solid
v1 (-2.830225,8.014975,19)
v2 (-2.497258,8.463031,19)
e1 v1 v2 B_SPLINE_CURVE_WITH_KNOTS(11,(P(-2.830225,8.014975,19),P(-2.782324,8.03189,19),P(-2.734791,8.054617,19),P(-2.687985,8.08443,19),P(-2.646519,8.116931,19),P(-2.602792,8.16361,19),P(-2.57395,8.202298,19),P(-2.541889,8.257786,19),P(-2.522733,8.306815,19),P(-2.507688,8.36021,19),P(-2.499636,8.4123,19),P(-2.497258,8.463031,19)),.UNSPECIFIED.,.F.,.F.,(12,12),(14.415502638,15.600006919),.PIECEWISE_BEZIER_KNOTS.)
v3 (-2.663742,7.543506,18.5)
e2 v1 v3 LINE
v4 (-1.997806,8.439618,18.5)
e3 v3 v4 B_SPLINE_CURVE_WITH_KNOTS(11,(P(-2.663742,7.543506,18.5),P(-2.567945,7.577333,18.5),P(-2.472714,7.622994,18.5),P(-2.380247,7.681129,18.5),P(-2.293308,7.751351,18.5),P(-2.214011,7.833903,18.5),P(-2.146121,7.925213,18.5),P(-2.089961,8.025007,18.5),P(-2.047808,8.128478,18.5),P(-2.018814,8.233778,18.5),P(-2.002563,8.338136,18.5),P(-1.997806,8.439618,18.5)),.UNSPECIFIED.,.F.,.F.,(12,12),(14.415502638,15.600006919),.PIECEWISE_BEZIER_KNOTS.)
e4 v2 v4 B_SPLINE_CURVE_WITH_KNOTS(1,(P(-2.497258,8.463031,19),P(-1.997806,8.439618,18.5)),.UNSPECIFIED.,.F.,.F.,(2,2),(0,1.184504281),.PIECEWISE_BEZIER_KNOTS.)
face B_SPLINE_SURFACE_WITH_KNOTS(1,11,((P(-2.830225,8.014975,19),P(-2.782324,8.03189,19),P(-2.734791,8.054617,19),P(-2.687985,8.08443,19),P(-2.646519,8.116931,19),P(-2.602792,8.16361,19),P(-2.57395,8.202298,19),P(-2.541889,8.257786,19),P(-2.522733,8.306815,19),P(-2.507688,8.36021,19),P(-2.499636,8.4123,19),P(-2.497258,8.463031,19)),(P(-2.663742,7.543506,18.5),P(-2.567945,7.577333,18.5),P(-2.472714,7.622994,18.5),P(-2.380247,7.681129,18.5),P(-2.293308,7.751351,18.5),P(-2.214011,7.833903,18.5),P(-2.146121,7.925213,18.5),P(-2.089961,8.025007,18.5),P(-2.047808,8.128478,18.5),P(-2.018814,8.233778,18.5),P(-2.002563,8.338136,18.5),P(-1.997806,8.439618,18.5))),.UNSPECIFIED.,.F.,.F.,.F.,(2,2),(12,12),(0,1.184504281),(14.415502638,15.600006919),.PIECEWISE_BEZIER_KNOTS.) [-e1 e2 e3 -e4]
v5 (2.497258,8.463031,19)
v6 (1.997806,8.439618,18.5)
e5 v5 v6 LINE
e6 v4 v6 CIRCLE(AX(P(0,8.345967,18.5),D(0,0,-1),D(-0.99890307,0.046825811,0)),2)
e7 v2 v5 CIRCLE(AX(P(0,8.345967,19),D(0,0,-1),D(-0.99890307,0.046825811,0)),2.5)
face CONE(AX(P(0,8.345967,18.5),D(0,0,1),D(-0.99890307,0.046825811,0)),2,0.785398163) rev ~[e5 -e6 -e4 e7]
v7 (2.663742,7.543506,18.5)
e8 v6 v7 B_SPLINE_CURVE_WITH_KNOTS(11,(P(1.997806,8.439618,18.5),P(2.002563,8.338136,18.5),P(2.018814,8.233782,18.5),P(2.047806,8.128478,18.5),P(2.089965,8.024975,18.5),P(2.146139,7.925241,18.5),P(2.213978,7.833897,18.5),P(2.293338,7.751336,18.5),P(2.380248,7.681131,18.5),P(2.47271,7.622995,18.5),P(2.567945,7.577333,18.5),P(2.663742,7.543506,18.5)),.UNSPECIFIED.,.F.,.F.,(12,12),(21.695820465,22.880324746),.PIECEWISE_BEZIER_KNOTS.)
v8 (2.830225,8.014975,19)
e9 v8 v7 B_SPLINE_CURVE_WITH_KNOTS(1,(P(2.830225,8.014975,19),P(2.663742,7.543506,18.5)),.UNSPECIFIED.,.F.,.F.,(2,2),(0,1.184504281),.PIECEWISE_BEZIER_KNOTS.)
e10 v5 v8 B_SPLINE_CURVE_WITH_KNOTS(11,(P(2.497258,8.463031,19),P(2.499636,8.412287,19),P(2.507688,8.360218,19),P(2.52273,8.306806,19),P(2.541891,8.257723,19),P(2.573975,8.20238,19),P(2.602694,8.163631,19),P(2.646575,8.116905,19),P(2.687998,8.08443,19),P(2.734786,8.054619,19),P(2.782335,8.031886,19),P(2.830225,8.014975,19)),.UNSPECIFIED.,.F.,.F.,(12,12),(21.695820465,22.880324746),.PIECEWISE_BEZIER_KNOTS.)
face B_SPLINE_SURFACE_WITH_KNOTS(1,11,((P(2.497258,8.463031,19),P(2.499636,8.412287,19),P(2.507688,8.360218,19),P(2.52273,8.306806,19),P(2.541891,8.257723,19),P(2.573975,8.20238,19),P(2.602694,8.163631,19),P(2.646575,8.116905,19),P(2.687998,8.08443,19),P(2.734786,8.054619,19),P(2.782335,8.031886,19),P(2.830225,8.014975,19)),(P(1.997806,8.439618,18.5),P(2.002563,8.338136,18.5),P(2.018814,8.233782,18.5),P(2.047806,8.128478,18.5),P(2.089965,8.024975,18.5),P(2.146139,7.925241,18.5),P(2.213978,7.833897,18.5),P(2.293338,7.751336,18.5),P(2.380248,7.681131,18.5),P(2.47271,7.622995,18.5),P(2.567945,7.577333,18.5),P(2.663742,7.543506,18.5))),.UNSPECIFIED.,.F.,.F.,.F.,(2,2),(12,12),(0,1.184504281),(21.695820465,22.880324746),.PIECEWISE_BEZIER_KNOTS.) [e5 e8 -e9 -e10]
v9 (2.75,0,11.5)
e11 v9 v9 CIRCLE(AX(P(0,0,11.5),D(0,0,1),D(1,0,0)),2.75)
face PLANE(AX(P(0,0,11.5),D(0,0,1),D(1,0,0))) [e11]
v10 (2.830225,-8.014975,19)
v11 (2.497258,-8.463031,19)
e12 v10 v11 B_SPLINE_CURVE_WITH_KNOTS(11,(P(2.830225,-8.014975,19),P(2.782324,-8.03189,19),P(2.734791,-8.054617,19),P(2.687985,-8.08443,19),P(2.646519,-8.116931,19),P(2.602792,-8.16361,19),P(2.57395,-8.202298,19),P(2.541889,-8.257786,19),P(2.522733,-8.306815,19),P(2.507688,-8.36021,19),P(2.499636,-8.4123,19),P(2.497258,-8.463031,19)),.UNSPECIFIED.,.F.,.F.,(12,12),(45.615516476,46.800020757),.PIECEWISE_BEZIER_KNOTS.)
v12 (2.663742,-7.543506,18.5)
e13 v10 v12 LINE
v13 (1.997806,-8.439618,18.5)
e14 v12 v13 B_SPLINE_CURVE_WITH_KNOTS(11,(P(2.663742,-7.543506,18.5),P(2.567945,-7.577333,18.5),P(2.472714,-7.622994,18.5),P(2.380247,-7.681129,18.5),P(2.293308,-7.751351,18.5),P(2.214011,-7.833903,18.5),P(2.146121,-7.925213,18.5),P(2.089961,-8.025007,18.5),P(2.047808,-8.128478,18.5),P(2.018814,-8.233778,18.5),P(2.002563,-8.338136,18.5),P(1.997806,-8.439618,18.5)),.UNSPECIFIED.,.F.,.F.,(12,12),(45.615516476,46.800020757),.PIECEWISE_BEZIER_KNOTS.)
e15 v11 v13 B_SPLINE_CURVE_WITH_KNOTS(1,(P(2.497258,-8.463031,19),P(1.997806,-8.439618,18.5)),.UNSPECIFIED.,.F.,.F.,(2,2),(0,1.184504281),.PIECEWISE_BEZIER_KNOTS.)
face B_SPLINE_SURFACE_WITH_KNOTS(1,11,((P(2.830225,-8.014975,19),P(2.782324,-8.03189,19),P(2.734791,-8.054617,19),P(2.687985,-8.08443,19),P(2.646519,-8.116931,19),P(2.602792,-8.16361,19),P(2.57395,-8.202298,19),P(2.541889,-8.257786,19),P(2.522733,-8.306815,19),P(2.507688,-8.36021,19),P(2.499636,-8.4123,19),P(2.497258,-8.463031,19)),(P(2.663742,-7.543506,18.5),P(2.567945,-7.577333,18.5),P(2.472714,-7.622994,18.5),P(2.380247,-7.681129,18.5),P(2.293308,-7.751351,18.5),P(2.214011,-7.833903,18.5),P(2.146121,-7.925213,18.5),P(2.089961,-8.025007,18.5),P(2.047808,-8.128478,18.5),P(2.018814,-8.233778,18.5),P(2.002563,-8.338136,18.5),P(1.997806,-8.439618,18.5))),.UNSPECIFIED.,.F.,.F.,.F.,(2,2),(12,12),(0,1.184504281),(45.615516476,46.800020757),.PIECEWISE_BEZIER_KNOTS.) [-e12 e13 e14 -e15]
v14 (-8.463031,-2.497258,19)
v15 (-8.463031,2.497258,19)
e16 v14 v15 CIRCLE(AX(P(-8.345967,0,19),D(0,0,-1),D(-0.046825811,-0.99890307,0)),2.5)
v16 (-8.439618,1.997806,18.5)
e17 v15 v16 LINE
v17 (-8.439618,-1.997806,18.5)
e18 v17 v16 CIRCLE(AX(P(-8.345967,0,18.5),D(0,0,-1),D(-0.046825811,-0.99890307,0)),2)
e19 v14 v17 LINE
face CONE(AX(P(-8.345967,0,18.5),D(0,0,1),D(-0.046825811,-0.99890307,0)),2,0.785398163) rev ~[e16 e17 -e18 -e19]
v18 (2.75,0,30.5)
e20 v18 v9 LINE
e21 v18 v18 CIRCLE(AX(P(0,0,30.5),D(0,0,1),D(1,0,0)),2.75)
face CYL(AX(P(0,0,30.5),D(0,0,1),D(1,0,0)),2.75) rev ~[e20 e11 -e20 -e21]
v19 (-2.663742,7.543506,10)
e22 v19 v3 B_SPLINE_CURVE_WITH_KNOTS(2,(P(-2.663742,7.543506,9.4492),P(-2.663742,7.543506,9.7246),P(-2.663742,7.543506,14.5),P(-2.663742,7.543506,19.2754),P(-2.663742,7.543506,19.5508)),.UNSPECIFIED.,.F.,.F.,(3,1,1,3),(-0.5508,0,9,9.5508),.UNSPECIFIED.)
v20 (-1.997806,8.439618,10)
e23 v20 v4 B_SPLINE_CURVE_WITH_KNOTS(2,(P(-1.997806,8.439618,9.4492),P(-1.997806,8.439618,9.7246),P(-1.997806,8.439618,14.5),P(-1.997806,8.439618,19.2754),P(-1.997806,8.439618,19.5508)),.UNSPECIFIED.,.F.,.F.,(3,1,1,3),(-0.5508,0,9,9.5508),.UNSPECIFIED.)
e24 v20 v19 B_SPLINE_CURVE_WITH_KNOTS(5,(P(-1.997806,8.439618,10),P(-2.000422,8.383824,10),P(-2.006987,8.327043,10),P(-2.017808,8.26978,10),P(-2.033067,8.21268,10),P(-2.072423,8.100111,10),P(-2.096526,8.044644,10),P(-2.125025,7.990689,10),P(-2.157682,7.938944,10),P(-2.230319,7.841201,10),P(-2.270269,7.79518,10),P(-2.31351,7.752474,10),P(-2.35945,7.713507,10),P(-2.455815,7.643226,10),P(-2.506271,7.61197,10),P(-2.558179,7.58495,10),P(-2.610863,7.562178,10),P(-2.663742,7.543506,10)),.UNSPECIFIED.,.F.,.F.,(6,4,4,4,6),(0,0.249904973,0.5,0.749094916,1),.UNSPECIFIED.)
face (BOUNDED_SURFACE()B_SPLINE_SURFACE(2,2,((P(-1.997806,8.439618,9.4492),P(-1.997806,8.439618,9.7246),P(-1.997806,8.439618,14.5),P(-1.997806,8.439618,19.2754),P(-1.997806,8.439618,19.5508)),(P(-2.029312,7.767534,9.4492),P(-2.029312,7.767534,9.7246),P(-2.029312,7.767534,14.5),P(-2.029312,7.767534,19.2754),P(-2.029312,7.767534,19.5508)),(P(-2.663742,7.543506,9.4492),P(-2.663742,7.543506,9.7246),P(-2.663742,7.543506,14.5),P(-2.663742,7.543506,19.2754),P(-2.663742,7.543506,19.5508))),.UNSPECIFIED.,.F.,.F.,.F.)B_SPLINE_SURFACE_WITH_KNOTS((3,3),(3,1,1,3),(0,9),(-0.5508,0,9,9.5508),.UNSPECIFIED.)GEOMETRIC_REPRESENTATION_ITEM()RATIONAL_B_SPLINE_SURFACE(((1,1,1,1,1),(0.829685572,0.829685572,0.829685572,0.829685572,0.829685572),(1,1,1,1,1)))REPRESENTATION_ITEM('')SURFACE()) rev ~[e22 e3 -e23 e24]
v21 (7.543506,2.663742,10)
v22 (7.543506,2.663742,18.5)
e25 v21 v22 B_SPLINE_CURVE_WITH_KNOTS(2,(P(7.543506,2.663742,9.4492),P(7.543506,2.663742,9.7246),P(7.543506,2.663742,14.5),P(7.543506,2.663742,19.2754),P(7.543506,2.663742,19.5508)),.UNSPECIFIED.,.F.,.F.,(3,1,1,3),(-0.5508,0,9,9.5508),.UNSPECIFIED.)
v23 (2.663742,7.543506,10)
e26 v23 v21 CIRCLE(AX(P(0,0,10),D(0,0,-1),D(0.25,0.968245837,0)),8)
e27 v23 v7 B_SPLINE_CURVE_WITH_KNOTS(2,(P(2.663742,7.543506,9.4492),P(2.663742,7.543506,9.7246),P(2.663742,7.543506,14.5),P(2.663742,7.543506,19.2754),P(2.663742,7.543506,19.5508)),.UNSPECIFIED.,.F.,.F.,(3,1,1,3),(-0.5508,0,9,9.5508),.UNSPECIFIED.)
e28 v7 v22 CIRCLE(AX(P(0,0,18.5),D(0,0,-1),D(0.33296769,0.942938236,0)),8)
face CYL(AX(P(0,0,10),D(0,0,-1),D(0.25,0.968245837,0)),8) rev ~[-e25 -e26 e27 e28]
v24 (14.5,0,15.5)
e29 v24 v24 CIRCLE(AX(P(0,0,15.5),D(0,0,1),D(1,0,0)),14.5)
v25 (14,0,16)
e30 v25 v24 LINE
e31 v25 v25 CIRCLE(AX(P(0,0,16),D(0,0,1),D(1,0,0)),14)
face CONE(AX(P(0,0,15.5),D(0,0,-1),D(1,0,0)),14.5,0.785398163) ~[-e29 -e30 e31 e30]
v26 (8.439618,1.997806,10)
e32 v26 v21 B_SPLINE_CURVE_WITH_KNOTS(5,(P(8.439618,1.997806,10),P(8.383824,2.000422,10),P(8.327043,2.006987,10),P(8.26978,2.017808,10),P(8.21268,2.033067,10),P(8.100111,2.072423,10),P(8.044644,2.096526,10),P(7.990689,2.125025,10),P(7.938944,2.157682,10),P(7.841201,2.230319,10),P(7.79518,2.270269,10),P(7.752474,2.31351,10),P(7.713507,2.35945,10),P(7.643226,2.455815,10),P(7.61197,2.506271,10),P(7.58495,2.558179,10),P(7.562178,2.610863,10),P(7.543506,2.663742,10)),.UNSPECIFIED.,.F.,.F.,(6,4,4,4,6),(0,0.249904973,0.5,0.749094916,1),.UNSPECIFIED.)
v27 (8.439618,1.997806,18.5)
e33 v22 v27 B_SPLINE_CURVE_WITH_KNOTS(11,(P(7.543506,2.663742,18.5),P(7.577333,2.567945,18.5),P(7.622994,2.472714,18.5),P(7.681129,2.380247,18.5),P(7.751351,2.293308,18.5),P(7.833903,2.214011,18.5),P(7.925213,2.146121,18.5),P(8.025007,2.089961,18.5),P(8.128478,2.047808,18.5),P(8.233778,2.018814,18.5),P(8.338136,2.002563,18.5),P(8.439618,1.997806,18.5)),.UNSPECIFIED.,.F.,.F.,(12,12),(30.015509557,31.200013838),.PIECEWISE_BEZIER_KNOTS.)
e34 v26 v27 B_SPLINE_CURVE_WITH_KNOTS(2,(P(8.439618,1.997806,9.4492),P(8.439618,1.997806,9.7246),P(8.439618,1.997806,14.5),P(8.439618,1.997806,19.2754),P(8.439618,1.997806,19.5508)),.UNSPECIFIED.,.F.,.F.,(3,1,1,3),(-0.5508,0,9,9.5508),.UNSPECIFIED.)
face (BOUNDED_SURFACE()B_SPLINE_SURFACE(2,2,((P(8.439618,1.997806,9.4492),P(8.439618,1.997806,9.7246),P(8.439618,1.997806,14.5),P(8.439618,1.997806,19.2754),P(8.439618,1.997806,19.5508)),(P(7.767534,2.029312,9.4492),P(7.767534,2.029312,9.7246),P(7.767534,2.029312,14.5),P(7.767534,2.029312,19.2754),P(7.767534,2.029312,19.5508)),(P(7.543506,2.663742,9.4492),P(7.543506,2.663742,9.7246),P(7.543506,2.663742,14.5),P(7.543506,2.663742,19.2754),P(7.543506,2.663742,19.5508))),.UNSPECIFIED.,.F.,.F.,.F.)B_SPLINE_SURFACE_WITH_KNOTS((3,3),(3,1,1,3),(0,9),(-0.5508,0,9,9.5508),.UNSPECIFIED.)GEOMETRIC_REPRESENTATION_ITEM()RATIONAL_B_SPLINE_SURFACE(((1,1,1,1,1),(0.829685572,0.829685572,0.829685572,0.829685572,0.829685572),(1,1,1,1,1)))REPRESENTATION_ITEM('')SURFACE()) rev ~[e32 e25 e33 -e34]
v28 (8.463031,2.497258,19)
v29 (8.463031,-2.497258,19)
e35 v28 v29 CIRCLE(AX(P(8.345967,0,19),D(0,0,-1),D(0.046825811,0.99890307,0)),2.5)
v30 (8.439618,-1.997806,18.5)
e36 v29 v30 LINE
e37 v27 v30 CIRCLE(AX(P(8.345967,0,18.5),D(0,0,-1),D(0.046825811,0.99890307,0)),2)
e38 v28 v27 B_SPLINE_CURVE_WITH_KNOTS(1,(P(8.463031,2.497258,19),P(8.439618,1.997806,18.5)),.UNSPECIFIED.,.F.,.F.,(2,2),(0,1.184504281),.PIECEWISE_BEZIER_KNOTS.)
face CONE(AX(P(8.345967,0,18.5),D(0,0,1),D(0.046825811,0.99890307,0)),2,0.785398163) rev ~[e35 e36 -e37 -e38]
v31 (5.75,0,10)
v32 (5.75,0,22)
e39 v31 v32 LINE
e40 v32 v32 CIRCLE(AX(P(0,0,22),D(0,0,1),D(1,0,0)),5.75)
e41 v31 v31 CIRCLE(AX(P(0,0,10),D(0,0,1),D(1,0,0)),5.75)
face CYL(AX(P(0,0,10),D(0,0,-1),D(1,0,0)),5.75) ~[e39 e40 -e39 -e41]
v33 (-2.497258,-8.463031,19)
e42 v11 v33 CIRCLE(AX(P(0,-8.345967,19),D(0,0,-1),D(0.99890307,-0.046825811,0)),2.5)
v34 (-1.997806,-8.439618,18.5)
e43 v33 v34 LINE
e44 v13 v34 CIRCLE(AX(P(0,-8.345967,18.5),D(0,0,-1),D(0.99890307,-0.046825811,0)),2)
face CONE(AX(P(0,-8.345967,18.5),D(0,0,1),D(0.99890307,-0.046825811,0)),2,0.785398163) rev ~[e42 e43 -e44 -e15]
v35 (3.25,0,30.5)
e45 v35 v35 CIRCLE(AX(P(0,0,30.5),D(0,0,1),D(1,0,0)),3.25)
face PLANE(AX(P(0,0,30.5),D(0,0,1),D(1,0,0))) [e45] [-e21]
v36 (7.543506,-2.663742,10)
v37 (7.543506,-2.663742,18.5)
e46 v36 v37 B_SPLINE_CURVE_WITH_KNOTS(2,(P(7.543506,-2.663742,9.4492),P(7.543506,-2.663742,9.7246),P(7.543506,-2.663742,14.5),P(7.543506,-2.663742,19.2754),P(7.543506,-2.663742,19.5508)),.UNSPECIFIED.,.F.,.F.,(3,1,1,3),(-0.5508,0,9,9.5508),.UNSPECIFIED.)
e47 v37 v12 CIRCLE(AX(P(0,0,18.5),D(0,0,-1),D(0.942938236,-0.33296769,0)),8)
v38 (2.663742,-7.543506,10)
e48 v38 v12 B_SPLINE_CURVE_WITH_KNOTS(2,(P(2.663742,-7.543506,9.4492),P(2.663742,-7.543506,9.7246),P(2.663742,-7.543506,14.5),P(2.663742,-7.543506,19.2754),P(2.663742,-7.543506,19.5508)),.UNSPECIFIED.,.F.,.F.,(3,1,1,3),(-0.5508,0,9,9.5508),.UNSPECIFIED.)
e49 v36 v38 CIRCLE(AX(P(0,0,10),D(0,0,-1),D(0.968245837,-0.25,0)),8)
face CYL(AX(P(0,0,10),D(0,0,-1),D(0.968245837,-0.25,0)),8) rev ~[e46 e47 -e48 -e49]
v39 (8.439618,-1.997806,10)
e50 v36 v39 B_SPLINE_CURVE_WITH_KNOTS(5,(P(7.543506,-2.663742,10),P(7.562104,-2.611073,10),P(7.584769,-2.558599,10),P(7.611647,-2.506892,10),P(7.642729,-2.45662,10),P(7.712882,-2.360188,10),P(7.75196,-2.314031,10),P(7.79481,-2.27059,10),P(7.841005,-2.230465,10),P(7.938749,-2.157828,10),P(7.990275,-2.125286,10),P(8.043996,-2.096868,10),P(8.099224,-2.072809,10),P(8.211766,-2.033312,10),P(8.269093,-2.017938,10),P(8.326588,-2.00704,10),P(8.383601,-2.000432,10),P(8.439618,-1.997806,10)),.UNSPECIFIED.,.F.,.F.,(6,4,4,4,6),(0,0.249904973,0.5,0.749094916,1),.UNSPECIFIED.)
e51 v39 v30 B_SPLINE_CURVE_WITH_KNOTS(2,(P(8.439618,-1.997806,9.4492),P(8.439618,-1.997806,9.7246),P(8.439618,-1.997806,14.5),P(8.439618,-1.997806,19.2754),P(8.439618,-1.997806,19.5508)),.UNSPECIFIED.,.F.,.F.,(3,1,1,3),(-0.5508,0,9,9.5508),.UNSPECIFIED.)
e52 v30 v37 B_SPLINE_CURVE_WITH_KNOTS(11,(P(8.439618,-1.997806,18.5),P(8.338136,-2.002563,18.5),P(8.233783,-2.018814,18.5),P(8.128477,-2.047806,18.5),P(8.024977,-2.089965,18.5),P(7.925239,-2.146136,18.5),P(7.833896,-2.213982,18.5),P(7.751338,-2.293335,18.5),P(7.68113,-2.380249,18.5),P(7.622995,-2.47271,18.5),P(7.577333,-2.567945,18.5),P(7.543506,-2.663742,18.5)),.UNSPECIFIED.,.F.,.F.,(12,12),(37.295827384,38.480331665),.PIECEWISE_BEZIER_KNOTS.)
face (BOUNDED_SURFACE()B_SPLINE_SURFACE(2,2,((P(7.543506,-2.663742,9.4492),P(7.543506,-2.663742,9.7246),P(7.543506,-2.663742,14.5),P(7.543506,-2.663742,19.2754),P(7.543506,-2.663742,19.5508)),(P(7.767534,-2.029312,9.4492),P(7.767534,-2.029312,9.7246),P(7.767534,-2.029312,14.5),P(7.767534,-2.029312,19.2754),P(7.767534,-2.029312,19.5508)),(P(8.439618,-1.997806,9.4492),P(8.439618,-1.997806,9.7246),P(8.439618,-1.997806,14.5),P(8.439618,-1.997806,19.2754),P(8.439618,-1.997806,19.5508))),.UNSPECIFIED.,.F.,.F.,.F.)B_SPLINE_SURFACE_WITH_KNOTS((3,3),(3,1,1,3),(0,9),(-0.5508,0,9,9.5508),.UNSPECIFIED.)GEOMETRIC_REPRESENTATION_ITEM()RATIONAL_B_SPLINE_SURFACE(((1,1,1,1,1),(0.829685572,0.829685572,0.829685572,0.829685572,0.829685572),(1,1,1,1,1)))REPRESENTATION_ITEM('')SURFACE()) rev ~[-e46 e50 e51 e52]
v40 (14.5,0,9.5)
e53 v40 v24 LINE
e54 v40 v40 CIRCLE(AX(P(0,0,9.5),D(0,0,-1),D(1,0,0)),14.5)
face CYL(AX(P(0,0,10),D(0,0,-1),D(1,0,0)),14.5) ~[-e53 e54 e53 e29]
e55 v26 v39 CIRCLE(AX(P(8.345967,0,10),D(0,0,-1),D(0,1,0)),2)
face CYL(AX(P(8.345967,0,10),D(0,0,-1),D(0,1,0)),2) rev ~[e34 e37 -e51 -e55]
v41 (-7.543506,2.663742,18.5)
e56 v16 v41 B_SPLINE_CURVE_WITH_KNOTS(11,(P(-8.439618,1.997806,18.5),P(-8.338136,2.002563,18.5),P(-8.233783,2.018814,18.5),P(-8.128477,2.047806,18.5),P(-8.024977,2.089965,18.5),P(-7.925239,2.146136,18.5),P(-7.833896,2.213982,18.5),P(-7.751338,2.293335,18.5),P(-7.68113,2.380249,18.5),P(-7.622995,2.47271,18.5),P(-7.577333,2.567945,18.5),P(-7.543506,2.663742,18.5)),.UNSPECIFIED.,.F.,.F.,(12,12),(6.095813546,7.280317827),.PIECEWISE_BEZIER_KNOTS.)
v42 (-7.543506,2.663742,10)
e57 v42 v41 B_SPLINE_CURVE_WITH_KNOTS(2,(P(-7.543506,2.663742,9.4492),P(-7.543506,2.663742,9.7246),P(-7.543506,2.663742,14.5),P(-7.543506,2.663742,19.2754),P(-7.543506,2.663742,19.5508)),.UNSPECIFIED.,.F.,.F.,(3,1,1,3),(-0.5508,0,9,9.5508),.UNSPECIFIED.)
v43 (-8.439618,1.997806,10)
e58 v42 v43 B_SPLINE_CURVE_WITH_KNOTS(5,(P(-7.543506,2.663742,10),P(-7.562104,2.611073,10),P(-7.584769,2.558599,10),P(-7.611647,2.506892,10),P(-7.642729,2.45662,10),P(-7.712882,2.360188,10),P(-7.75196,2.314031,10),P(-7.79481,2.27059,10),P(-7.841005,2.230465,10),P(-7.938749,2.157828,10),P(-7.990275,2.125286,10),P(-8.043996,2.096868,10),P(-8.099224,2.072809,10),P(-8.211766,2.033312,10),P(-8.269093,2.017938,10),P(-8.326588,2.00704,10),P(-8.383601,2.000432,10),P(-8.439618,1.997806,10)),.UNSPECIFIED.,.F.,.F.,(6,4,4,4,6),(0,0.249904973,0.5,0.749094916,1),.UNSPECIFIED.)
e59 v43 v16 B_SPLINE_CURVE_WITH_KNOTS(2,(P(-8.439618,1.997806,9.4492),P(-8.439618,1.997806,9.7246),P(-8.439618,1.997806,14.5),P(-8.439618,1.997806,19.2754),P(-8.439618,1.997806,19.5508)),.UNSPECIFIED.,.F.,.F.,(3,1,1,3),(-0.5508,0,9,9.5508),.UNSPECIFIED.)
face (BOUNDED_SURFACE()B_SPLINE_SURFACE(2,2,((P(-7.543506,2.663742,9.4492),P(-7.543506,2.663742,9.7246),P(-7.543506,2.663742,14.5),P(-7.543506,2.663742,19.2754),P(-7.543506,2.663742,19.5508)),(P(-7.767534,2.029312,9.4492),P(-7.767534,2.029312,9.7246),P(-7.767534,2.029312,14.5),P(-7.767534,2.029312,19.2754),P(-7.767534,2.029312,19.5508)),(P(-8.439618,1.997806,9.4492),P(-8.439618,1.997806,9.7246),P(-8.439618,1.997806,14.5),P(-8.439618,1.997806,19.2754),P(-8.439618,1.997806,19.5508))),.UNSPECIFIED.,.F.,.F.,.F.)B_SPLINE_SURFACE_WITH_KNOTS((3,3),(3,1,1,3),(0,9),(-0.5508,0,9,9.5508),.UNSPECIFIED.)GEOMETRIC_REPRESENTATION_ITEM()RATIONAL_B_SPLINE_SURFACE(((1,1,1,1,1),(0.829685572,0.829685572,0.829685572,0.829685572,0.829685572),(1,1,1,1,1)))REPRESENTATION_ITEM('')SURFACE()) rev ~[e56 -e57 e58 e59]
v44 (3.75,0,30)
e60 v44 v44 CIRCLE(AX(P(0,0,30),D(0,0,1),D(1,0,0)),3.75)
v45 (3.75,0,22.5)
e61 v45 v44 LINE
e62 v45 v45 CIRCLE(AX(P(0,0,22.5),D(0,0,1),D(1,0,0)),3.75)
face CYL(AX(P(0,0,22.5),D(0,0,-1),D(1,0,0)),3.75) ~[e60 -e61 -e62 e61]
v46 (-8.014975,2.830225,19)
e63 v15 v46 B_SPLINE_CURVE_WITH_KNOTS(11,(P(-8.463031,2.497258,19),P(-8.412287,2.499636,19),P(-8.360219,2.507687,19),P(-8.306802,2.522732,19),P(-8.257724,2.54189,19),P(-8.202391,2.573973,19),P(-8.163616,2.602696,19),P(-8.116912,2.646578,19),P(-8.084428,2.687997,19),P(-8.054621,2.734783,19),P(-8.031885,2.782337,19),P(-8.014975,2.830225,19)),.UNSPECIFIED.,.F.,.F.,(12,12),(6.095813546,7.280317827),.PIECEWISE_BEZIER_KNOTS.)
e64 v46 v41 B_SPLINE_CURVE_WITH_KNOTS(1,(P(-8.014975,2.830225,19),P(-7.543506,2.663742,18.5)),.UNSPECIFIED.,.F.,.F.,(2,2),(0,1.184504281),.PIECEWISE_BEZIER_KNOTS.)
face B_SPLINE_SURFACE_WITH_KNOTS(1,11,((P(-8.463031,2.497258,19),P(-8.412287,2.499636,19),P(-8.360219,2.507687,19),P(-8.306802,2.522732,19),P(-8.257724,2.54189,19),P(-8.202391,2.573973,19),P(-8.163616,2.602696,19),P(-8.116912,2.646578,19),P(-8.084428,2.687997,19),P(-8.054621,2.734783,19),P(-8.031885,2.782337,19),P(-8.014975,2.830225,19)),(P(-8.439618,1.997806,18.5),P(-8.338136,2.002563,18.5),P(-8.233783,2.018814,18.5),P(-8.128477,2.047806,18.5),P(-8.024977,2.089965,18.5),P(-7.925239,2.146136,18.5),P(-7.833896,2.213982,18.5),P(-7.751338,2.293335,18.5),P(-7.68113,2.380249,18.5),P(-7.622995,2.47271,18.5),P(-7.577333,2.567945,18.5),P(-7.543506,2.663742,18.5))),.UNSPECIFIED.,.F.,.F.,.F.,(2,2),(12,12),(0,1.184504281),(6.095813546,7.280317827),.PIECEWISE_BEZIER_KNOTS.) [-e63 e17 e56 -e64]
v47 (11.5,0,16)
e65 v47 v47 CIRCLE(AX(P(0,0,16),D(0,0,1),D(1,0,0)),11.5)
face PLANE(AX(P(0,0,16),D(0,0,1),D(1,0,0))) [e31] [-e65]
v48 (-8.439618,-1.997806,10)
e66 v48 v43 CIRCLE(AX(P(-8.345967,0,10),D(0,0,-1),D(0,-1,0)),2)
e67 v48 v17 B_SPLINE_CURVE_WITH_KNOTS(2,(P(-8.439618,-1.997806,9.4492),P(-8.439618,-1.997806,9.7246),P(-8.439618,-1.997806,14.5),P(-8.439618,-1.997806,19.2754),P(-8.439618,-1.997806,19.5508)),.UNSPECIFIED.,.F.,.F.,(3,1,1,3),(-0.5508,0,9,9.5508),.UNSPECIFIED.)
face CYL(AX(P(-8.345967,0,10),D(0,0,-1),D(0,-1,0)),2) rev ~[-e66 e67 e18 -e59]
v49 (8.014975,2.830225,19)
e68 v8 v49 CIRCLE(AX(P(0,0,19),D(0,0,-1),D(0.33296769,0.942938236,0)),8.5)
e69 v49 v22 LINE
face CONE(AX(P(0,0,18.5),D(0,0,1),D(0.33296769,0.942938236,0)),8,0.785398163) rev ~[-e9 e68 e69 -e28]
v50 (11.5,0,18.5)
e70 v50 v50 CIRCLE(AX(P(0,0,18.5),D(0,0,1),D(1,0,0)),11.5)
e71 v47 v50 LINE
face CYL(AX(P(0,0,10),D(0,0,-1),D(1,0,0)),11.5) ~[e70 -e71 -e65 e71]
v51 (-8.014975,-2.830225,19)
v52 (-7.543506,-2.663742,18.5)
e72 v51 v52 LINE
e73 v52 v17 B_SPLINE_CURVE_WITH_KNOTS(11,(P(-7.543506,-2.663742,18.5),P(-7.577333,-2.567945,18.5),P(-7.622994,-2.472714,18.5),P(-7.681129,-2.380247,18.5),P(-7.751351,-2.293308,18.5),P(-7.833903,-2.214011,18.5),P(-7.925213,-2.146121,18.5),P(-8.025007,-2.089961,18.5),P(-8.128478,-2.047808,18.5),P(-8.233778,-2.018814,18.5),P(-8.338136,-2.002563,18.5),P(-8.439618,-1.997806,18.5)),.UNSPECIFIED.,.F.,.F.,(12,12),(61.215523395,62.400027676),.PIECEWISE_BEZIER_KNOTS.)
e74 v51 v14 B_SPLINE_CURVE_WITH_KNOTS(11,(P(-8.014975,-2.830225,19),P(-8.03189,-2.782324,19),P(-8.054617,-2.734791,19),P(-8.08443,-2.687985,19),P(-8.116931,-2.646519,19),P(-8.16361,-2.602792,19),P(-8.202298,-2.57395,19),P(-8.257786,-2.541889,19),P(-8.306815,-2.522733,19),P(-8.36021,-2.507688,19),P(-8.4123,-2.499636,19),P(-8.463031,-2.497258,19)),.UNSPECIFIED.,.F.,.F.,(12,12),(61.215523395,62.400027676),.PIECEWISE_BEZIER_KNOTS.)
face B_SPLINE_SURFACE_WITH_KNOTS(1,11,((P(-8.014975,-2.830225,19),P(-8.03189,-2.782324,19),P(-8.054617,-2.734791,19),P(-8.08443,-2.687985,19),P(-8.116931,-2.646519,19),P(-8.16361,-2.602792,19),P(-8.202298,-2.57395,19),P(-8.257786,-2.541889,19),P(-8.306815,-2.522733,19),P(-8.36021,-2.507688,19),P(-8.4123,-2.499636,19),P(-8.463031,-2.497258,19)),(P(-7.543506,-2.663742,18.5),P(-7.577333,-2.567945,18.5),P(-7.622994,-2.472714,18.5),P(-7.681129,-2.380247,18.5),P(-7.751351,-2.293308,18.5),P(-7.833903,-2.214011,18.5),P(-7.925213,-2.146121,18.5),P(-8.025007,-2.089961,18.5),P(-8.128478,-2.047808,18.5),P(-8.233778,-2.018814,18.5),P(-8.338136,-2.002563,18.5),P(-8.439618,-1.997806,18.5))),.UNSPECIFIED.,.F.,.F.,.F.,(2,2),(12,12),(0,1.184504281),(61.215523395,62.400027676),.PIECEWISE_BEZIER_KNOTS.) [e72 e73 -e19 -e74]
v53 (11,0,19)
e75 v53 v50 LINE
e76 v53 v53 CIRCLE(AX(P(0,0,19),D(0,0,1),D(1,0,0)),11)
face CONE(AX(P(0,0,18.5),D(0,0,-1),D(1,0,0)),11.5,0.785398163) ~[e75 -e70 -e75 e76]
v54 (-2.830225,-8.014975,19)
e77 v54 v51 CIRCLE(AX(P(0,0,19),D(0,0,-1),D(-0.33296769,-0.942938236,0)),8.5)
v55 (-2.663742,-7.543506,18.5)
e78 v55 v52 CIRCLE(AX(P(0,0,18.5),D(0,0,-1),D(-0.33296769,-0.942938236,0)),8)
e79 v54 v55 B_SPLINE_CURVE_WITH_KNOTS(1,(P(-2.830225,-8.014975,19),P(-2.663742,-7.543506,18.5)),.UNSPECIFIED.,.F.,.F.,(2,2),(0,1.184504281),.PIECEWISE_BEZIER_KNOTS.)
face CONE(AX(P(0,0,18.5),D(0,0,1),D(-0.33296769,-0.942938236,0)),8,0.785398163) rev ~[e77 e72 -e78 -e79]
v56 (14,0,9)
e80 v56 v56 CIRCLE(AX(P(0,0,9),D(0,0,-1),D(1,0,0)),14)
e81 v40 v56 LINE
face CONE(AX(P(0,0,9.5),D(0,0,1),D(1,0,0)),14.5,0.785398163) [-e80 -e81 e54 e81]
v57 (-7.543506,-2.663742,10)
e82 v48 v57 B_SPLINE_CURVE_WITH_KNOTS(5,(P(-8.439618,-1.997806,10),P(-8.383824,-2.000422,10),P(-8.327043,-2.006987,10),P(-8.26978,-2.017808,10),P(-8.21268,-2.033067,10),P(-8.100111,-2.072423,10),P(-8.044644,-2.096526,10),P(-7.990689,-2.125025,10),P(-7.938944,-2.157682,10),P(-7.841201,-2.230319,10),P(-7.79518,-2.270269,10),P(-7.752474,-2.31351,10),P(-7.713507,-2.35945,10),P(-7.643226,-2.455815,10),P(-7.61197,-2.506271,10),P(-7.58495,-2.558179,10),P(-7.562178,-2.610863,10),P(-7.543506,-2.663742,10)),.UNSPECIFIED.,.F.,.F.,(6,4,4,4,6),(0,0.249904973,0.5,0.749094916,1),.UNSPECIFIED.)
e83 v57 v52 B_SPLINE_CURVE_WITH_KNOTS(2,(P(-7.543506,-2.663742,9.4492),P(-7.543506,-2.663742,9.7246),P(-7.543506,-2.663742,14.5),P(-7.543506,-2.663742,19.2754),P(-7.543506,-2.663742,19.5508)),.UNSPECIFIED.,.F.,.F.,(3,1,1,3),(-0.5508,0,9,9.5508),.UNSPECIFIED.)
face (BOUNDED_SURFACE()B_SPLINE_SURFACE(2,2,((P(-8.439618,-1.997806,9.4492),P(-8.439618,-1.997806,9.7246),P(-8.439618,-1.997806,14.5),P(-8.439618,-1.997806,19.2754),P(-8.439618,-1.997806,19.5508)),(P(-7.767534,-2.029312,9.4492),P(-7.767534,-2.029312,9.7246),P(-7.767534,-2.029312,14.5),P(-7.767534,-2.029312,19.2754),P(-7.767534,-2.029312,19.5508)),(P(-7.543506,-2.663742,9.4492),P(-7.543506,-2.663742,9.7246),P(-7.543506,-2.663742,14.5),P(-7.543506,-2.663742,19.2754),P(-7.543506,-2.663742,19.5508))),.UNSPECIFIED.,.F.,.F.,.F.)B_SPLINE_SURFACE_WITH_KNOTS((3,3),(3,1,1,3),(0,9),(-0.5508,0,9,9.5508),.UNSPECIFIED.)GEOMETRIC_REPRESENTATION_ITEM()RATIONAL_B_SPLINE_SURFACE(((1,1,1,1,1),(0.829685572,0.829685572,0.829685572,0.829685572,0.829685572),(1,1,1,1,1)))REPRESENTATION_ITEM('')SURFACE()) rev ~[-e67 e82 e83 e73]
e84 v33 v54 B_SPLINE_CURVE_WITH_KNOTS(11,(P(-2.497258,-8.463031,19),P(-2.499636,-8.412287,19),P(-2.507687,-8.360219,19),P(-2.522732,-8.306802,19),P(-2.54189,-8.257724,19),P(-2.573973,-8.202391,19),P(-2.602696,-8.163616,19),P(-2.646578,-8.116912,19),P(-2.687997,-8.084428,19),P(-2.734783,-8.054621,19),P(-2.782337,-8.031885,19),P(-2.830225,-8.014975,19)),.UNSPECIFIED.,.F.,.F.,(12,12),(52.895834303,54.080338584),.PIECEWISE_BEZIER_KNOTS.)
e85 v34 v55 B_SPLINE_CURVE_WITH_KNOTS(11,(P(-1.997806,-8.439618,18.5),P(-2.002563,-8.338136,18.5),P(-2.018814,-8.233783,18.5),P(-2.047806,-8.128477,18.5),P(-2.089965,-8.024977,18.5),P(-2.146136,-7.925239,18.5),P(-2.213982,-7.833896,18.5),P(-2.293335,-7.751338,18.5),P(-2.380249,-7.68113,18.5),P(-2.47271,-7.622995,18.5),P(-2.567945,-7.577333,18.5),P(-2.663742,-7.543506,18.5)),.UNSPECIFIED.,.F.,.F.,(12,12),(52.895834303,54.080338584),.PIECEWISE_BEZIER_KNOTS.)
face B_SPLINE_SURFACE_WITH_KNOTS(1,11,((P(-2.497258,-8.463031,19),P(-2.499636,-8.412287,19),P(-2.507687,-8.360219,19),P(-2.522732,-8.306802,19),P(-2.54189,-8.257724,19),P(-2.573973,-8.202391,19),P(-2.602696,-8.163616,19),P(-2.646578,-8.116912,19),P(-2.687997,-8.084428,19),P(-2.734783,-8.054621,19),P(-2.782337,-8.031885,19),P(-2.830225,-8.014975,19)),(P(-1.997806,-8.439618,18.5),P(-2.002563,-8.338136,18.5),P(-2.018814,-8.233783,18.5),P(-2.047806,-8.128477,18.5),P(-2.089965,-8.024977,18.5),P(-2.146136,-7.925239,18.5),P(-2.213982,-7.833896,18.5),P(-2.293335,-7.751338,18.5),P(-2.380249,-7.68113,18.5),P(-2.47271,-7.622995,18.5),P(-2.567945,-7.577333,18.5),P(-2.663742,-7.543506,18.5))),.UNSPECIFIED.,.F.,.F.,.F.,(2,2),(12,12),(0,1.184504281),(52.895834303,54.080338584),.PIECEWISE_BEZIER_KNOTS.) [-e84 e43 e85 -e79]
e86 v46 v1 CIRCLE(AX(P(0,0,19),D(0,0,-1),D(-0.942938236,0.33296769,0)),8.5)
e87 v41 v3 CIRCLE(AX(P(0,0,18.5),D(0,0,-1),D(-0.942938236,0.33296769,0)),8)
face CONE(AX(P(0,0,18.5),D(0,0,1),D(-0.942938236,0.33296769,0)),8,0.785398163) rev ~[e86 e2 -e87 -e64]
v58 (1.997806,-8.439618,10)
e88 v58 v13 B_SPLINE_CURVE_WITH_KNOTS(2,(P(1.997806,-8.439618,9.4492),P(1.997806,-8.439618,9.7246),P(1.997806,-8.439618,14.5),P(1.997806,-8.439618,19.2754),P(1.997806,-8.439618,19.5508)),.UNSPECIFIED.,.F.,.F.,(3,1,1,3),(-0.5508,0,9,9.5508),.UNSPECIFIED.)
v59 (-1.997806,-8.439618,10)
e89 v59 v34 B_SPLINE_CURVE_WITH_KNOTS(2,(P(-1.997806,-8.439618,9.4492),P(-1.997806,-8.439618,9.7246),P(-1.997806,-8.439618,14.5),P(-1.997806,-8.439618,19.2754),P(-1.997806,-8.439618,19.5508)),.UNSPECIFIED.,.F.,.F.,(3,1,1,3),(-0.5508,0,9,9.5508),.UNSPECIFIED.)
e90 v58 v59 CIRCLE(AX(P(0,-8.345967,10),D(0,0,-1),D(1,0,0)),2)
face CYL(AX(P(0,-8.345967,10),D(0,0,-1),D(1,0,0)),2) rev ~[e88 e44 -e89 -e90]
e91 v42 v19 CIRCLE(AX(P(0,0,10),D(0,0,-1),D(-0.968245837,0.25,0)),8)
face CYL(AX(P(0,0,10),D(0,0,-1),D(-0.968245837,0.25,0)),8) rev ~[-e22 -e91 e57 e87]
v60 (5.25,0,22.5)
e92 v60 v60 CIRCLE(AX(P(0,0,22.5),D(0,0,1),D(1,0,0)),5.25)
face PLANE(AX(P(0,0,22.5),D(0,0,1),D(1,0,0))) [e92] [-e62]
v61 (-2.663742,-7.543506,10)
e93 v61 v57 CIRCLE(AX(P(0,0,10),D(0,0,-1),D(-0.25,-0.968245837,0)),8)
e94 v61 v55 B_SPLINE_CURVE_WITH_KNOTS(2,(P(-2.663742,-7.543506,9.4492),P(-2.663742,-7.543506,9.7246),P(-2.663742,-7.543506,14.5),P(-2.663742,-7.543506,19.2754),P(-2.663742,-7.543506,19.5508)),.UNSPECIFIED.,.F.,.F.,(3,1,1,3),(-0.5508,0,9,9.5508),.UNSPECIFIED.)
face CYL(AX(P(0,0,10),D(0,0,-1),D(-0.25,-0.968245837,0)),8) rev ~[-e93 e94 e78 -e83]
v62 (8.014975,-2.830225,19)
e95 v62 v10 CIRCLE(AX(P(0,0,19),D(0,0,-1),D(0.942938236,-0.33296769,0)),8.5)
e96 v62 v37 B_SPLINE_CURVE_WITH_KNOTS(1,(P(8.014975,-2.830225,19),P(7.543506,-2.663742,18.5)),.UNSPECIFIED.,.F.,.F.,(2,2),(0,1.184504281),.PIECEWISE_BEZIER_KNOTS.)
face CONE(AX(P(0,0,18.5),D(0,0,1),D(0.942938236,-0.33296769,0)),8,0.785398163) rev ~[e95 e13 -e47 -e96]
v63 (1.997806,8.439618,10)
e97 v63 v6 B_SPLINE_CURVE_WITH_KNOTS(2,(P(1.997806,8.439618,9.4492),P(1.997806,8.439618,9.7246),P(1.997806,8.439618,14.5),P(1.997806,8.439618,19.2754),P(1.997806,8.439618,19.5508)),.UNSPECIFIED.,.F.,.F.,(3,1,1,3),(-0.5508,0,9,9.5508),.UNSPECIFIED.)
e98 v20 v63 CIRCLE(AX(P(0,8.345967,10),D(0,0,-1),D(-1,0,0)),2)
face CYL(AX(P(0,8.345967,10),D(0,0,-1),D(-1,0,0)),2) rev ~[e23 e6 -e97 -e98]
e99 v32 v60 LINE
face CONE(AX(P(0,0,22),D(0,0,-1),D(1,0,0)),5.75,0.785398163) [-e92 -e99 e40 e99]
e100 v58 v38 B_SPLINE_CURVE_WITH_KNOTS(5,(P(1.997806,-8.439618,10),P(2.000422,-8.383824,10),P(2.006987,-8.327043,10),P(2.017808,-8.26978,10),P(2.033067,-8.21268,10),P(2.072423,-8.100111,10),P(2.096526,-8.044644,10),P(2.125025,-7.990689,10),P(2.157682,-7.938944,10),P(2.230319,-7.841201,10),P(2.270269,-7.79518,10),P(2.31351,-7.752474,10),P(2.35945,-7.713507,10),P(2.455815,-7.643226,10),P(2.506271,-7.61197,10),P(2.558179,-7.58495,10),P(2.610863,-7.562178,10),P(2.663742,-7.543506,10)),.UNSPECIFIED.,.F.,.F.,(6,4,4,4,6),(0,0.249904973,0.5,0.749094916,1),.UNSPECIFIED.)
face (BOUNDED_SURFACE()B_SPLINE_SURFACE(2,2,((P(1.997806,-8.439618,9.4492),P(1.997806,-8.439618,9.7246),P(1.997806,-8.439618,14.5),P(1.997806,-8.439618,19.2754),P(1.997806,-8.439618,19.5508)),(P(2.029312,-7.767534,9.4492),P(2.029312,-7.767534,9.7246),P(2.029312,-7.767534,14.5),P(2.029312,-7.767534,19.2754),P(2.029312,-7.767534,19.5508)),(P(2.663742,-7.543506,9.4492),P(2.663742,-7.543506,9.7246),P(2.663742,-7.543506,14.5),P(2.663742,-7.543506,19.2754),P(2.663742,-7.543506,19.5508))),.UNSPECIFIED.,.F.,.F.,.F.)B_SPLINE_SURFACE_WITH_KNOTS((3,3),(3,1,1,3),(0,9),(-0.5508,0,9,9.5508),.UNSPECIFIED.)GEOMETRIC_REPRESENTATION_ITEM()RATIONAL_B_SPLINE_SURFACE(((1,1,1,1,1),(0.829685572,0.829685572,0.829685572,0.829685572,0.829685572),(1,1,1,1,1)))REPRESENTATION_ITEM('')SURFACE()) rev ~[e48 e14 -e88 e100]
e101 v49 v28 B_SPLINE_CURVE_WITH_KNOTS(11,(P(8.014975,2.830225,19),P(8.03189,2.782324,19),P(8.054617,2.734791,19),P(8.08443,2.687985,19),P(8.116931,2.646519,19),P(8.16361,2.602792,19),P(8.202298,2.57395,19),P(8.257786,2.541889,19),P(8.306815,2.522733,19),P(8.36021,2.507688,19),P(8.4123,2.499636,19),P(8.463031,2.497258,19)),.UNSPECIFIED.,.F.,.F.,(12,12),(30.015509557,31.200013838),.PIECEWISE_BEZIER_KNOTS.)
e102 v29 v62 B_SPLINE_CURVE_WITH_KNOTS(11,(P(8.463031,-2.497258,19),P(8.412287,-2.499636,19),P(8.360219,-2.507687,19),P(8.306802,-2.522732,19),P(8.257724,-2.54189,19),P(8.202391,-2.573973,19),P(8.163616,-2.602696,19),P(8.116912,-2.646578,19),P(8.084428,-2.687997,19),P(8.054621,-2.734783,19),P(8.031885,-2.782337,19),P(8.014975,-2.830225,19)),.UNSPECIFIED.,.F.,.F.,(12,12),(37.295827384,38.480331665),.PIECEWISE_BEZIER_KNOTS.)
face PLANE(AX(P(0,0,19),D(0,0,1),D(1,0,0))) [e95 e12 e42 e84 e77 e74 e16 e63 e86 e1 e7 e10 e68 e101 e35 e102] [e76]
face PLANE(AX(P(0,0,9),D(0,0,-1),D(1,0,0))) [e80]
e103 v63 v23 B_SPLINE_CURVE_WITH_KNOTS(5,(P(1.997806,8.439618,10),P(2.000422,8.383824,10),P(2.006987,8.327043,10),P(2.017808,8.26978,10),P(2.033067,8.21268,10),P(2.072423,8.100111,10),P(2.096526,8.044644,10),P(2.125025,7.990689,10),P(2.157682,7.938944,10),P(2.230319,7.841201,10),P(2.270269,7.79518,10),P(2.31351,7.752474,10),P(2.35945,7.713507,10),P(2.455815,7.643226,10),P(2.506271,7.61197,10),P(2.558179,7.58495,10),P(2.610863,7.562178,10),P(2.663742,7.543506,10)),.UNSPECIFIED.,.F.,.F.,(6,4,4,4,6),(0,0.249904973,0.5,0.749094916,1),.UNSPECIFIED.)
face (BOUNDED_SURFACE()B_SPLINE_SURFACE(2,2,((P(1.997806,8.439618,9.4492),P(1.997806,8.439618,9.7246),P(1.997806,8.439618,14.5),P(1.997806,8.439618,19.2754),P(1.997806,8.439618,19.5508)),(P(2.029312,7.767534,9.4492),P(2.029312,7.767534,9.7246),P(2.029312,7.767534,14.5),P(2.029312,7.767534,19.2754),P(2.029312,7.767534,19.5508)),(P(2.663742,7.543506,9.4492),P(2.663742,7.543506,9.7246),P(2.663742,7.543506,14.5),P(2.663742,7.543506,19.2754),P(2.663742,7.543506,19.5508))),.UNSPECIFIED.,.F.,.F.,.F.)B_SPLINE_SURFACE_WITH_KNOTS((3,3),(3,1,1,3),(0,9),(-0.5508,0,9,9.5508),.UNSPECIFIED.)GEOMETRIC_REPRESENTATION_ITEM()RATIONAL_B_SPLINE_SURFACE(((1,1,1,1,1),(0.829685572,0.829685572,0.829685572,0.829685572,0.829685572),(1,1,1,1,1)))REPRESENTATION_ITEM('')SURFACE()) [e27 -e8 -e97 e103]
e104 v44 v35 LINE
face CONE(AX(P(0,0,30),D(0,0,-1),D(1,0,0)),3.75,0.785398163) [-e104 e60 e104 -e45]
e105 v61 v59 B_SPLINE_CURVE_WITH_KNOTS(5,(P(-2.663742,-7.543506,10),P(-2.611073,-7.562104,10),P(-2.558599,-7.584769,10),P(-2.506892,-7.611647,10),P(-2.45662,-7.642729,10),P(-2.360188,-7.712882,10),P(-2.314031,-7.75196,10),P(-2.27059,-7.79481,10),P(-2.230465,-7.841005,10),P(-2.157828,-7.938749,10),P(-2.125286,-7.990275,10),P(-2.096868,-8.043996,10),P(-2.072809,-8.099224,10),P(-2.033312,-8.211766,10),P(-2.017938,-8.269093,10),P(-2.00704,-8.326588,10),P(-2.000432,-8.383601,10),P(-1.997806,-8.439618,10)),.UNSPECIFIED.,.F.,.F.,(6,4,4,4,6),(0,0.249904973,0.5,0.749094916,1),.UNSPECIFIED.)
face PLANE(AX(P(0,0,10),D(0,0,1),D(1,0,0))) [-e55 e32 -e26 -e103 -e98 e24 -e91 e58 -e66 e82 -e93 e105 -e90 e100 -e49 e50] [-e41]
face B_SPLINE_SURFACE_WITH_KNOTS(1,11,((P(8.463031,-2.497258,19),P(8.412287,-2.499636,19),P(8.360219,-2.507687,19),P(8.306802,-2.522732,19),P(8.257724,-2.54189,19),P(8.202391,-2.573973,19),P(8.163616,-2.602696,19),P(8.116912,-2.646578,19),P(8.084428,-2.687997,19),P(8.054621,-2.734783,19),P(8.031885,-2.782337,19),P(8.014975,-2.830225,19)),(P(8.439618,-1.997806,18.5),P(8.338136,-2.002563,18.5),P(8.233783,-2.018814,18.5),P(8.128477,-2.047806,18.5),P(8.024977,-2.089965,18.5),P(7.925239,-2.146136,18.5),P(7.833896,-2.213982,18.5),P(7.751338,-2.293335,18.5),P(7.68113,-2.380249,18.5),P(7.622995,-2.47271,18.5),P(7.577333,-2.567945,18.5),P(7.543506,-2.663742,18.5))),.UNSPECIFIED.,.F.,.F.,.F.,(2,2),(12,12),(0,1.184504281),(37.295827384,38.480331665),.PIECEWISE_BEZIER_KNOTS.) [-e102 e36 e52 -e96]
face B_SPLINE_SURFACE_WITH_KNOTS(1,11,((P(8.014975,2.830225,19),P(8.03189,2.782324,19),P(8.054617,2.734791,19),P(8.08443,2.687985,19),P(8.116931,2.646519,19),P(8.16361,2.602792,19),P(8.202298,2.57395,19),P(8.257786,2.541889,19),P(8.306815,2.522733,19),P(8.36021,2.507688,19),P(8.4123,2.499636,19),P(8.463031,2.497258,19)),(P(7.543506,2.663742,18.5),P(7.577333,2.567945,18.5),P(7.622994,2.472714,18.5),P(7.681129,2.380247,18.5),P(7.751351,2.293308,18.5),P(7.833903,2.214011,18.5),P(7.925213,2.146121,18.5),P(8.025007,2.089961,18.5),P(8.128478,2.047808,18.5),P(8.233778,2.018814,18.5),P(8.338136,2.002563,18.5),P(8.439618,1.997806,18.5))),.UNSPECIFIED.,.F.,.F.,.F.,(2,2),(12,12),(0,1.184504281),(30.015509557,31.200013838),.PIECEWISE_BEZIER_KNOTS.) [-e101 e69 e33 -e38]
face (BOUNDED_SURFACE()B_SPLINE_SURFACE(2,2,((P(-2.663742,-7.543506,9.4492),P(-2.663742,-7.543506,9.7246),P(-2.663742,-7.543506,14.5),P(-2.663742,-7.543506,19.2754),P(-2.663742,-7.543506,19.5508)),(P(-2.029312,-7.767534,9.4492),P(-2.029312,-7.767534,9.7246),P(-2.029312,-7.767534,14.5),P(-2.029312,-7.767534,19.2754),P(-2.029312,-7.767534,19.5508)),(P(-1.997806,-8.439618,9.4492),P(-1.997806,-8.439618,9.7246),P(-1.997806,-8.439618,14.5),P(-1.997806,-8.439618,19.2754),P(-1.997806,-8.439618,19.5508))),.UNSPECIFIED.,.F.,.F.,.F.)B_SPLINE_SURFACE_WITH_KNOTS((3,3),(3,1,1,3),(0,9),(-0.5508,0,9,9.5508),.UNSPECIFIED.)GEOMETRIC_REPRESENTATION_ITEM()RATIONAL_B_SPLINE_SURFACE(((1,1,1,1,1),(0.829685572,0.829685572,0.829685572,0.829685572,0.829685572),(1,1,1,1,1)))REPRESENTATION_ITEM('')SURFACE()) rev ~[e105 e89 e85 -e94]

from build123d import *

# Parameters (mm, degrees)
F0_R      = 14.5
F1_DEPTH  = 10
F2_R      = 11.5
F3_DEPTH  = 9
F4_R      = 14.5
F4_R_2    = 11.5
F5_DEPTH  = 6
F6_R      = 25
F7_DEPTH  = 9
F8_R      = 1
F9_R      = 5.75
F10_DEPTH = 12.5
F11_R     = 3.75
F12_DEPTH = 8
F13_SIZE  = 0.5
F14_R     = 2.75
F15_DEPTH = 19


with BuildPart() as f1:
    # F0 (on Top) → F1 (new body)
    with BuildSketch(Plane.XY):
        Circle(F0_R)
    extrude(amount=F1_DEPTH)

    # F2 (on face) → F3 (join)
    with BuildSketch(Plane.XY.offset(10)):
        Circle(F2_R)
        with BuildLine():
            ThreePointArc((2, 7.7459666924), (5.6568542495, 5.6568542495), (7.7459666924, 2))
            Line((7.7459666924, 2), (8.3459666924, 2))
            ThreePointArc((8.3459666924, 2), (10.3459666924, 0), (8.3459666924, -2))
            Line((8.3459666924, -2), (7.7459666924, -2))
            ThreePointArc((7.7459666924, -2), (5.6568542495, -5.6568542495), (2, -7.7459666924))
            Line((2, -7.7459666924), (2, -8.3459666924))
            ThreePointArc((2, -8.3459666924), (0, -10.3459666924), (-2, -8.3459666924))
            Line((-2, -8.3459666924), (-2, -7.7459666924))
            ThreePointArc((-2, -7.7459666924), (-5.6568542495, -5.6568542495), (-7.7459666924, -2))
            Line((-7.7459666924, -2), (-8.3459666924, -2))
            ThreePointArc((-8.3459666924, -2), (-10.3459666924, 0), (-8.3459666924, 2))
            Line((-8.3459666924, 2), (-7.7459666924, 2))
            ThreePointArc((-7.7459666924, 2), (-5.6568542495, 5.6568542495), (-2, 7.7459666924))
            Line((-2, 7.7459666924), (-2, 8.3459666924))
            ThreePointArc((-2, 8.3459666924), (0, 10.3459666924), (2, 8.3459666924))
            Line((2, 8.3459666924), (2, 7.7459666924))
        make_face(mode=Mode.SUBTRACT)
    extrude(amount=F3_DEPTH)

    # F4 (on face) → F5 (join)
    with BuildSketch(Plane.XY.offset(10)):
        Circle(F4_R)
        Circle(F4_R_2, mode=Mode.SUBTRACT)
    extrude(amount=F5_DEPTH)

    # F6 (on face) → F7 (cut)
    with BuildSketch(Plane(origin=(0, 0, 0), x_dir=(1, 0, 0), z_dir=(0, 0, -1))):
        Circle(F6_R)
    extrude(amount=-F7_DEPTH, mode=Mode.SUBTRACT)

    # F8
    f8_edges = [f1.edges().sort_by_distance(p)[0] for p in [
        (-7.745967, 2, 14.5),
        (-2, 7.745967, 14.5),
        (2, 7.745967, 14.5),
        (7.745967, 2, 14.5),
        (-7.745967, -2, 14.5),
        (7.745967, -2, 14.5),
        (2, -7.745967, 14.5),
        (-2, -7.745967, 14.5),
    ]]
    fillet(f8_edges, radius=F8_R)

    # F9 (on face) → F10 (join)
    with BuildSketch(Plane.XY.offset(10)):
        Circle(F9_R)
    extrude(amount=F10_DEPTH)

    # F11 (on face) → F12 (join)
    with BuildSketch(Plane.XY.offset(22.5)):
        Circle(F11_R)
    extrude(amount=F12_DEPTH)

    # F13
    f13_edges = [f1.edges().sort_by_distance(p)[0] for p in [
        (-10.345967, 0, 19),
        (-7.889975, -2.194073, 19),
        (-7.889975, 2.194073, 19),
        (-5.656854, -5.656854, 19),
        (-5.656854, 5.656854, 19),
        (-2.194073, -7.889975, 19),
        (-2.194073, 7.889975, 19),
        (0, -10.345967, 19),
        (0, 10.345967, 19),
        (2.194073, -7.889975, 19),
        (2.194073, 7.889975, 19),
        (5.656854, -5.656854, 19),
        (5.656854, 5.656854, 19),
        (7.889975, -2.194073, 19),
        (7.889975, 2.194073, 19),
        (10.345967, 0, 19),
        (-11.5, 0, 19),
        (-14.5, 0, 16),
        (-3.75, 0, 30.5),
        (-5.75, 0, 22.5),
        (-14.5, 0, 9),
    ]]
    chamfer(f13_edges, length=F13_SIZE)

    # F14 (on face) → F15 (cut)
    with BuildSketch(Plane.XY.offset(30.5)):
        Circle(F14_R)
    extrude(amount=-F15_DEPTH, mode=Mode.SUBTRACT)


solid = f1.part
